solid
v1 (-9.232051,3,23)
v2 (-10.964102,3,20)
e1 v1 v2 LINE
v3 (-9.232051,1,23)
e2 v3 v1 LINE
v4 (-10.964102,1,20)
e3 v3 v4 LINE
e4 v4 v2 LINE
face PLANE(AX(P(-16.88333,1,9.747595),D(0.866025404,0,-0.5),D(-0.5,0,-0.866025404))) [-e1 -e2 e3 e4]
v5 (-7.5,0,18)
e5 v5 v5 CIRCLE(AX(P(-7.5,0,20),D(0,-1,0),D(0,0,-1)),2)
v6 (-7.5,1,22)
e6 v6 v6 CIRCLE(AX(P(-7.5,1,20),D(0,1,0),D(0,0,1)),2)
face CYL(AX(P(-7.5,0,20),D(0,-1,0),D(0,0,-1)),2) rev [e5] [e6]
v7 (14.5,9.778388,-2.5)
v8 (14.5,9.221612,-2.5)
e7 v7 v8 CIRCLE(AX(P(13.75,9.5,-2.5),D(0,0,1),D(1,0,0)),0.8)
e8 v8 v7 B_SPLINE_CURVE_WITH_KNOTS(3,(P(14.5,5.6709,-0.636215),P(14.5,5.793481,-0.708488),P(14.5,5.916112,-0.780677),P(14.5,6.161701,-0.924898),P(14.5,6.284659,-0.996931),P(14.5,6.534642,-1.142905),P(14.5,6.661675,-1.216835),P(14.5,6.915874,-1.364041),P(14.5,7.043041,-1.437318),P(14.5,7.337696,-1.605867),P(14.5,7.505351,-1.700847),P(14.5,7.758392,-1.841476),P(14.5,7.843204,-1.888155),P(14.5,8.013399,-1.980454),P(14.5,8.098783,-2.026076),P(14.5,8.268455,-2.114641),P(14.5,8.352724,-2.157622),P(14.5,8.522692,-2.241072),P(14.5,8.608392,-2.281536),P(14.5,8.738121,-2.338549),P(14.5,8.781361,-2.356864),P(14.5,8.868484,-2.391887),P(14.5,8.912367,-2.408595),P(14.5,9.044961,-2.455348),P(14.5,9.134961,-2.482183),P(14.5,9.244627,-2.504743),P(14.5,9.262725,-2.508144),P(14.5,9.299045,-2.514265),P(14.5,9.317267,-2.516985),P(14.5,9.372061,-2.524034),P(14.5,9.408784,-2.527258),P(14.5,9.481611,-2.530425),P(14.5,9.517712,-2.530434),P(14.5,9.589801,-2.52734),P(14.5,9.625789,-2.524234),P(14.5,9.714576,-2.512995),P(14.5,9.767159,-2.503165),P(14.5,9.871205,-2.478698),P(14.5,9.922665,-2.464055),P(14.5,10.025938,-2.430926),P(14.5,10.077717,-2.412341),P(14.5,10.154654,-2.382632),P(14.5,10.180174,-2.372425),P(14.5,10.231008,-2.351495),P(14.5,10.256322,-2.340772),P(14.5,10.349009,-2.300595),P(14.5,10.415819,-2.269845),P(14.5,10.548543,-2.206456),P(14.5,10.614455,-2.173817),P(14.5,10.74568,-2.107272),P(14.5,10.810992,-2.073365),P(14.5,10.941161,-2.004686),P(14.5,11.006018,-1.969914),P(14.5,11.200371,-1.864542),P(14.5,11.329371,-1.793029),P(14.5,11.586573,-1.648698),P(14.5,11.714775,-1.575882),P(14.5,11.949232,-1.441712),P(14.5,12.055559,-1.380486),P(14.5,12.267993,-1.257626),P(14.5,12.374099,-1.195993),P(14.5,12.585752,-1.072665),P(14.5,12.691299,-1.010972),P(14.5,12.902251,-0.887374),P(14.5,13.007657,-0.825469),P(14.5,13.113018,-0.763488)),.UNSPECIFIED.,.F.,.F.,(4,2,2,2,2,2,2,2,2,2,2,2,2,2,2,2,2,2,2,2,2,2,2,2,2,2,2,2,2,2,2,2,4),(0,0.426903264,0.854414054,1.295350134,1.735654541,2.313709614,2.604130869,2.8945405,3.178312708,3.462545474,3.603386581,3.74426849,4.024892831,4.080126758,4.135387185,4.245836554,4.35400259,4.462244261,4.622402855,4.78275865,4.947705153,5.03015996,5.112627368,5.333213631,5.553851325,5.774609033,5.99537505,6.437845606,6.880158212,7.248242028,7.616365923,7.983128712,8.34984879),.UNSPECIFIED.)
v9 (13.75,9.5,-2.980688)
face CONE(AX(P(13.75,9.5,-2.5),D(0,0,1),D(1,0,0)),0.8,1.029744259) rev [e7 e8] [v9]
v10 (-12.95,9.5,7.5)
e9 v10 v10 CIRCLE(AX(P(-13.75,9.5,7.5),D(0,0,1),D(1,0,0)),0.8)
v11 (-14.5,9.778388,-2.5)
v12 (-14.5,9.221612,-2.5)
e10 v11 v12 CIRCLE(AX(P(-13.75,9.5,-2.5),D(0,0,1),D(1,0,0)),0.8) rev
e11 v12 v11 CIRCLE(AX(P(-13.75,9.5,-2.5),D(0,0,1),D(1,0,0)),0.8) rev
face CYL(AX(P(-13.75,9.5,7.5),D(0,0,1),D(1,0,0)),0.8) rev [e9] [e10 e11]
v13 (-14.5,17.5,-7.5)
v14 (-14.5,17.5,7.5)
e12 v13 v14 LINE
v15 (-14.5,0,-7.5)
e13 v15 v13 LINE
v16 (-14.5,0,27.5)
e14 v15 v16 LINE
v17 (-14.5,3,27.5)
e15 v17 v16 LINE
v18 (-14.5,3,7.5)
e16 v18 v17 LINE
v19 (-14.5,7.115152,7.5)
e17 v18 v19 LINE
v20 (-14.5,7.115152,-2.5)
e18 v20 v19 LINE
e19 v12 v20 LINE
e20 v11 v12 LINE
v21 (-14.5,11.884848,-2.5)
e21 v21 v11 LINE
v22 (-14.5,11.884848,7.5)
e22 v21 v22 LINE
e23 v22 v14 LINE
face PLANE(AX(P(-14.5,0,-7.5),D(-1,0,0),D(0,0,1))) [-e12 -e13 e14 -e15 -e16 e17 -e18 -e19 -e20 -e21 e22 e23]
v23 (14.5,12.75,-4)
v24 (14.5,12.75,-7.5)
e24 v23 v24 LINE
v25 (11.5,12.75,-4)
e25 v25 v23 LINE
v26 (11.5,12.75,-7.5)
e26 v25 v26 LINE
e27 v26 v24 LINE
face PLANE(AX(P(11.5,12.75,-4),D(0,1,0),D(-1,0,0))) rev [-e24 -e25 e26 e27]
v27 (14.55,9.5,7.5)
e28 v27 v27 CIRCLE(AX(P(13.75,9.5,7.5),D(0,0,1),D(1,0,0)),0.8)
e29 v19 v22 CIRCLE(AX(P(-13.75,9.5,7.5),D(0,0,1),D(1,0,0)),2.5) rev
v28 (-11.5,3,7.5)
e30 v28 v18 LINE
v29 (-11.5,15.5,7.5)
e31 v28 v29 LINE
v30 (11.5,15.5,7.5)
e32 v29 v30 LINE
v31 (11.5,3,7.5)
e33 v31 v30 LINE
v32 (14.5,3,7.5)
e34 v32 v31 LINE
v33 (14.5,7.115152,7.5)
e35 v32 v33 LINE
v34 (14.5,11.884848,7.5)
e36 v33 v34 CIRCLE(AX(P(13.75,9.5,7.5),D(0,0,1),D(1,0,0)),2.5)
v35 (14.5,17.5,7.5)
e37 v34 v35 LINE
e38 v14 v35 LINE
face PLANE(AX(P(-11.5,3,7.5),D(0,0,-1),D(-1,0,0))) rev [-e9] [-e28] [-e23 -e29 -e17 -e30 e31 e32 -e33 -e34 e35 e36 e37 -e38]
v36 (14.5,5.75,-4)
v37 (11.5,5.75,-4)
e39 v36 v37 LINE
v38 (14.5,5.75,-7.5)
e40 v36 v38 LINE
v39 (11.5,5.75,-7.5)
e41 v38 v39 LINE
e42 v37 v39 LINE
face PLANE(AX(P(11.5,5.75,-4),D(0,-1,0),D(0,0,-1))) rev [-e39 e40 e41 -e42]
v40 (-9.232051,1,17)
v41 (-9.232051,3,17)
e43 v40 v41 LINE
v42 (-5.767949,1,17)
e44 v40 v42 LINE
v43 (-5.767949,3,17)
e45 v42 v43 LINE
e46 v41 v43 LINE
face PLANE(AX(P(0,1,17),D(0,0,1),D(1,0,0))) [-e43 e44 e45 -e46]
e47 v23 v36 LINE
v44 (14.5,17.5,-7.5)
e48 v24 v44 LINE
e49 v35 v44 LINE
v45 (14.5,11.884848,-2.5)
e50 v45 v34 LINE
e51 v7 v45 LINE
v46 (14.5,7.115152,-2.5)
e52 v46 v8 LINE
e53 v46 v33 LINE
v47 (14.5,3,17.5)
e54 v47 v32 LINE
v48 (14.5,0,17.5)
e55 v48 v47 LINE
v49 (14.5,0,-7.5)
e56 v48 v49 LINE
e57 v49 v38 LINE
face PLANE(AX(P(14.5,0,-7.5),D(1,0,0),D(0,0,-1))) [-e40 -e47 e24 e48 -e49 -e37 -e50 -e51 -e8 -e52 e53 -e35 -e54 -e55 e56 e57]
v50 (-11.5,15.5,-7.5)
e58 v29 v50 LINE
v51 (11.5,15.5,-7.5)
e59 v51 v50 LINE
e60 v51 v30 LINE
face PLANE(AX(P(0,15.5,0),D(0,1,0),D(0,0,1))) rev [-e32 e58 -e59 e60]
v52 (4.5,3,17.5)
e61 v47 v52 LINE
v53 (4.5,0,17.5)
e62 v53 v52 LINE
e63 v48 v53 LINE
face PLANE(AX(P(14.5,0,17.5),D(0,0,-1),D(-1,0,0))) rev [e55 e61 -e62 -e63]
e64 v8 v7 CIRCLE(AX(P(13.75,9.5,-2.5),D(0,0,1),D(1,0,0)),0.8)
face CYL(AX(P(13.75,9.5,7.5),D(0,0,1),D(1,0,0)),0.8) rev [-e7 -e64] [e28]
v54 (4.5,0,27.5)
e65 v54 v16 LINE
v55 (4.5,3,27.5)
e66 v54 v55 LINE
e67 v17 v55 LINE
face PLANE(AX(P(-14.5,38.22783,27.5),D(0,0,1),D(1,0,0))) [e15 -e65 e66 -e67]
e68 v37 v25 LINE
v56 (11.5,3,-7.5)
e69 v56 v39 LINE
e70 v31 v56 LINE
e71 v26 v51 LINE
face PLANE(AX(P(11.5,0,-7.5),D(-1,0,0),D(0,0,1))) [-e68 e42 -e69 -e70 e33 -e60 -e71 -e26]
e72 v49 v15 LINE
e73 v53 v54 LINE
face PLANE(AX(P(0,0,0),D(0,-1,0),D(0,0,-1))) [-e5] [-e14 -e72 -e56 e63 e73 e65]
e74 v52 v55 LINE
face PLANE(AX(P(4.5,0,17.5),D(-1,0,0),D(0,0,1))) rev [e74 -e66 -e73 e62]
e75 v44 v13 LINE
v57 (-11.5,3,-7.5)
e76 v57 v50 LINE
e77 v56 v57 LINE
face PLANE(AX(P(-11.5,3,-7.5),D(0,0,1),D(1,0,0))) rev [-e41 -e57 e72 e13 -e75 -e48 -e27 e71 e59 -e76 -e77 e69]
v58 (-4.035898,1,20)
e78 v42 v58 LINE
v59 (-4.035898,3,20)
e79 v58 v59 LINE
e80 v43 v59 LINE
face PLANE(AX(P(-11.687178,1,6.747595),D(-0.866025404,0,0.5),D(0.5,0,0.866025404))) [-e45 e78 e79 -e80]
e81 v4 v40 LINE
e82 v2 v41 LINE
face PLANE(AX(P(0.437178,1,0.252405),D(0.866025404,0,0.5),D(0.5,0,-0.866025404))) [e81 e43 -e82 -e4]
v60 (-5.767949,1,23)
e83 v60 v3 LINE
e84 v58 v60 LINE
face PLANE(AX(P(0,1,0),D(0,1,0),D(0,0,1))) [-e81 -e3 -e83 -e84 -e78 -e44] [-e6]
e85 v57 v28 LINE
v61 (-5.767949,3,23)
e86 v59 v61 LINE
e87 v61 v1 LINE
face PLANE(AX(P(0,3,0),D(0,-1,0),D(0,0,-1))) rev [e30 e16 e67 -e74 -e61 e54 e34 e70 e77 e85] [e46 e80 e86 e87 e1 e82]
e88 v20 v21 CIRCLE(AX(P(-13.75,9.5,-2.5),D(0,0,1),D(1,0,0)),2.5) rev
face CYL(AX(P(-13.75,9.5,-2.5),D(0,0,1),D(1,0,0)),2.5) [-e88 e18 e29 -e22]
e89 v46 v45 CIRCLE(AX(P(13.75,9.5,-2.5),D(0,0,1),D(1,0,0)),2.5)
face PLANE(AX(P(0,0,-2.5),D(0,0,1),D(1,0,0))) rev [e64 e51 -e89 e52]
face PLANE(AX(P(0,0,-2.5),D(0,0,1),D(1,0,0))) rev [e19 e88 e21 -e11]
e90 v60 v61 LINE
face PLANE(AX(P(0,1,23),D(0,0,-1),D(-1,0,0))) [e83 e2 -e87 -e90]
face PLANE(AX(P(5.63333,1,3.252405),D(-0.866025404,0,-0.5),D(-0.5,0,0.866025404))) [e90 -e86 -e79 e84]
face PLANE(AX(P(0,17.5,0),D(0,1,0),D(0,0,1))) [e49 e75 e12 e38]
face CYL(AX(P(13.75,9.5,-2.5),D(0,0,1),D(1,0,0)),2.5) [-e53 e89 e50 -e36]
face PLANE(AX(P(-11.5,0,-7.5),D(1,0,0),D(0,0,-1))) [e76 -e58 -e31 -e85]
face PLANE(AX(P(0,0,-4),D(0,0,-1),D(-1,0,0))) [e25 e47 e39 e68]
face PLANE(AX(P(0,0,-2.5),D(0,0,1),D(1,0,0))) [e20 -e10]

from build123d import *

# Parameters (mm, degrees)
SKETCH1_W                           = 23
SKETCH1_H                           = 15
BOSS_EXTRUDE1_DEPTH                 = 3
BOSS_EXTRUDE2_DEPTH                 = 12.5
BOSS_EXTRUDE2_DEPTH_BACK            = 3
SKETCH2_W                           = 3
SKETCH2_H                           = 15
BOSS_EXTRUDE3_DEPTH                 = 10
TAP_START                           = -2.5
TAP_DRILL_FOR_M2X0_4_TAP1_OUTLINE_R = 0.8
TAP_DRILL_FOR_M2X0_4_TAP1_DEPTH     = 10
SKETCH6_W                           = 29
SKETCH6_H                           = 20
BOSS_EXTRUDE4_DEPTH                 = 3
SKETCH7_W                           = 10
SKETCH7_H                           = 10
CUT_EXTRUDE1_DEPTH                  = 35.301056835
CUT_EXTRUDE2_DEPTH                  = 2
F_4_0_4_DIAMETER_HOLE1_D            = 4
F_4_0_4_DIAMETER_HOLE1_DEPTH        = 10
F_4_0_4_DIAMETER_HOLE1_TIP          = 1.201721238
SKETCH12_W                          = 29
SKETCH12_H                          = 15
BOSS_EXTRUDE5_DEPTH                 = 2
SKETCH13_W                          = 3
SKETCH13_H                          = 7
CUT_EXTRUDE4_DEPTH                  = 3.5


# Read off the part's stored shape, not the designer's step: Tap Drill for M2x0.4 Tap1
with BuildPart() as part:
    # Sketch1 → Boss-Extrude1 (new body)
    with BuildSketch(Plane(origin=(0, 0, 0), x_dir=(1, 0, 0), z_dir=(0, 1, 0))):
        Rectangle(SKETCH1_W, SKETCH1_H)
    extrude(amount=BOSS_EXTRUDE1_DEPTH)

    # Sketch2 → Boss-Extrude2 (add, two sides: drawn at the far end of the back side and taken through both)
    with BuildSketch(Plane(origin=(0, 3, 0), x_dir=(1, 0, 0), z_dir=(0, 1, 0)).offset(-BOSS_EXTRUDE2_DEPTH_BACK)):
        with Locations((13, 0)):
            Rectangle(SKETCH2_W, SKETCH2_H)
        with Locations((-13, 0)):
            Rectangle(SKETCH2_W, SKETCH2_H)
    extrude(amount=BOSS_EXTRUDE2_DEPTH + BOSS_EXTRUDE2_DEPTH_BACK)

    # Sketch3 → Boss-Extrude3 (add)
    with BuildSketch(Plane.XY.offset(7.5)):
        with BuildLine():
            ThreePointArc((16.25, 9.5), (15.765564437, 10.979019946), (14.5, 11.884848004))
            Line((14.5, 11.884848004), (14.5, 7.115151996))
            ThreePointArc((14.5, 7.115151996), (15.765564437, 8.020980054), (16.25, 9.5))
        make_face()
        with BuildLine():
            Line((-14.5, 7.115151996), (-14.5, 11.884848004))
            ThreePointArc((-14.5, 11.884848004), (-16.25, 9.5), (-14.5, 7.115151996))
        make_face()
    extrude(amount=-BOSS_EXTRUDE3_DEPTH)

    # Tap Drill for M2x0.4 Tap1 outline → Tap Drill for M2x0.4 Tap1 (cut)
    with BuildSketch(Plane.XY.offset(TAP_START)):
        with Locations((-13.75, 9.5)):
            Circle(TAP_DRILL_FOR_M2X0_4_TAP1_OUTLINE_R)
    extrude(amount=TAP_DRILL_FOR_M2X0_4_TAP1_DEPTH, mode=Mode.SUBTRACT)

    # Tap Drill for M2x0.4 Tap1 2 outline → Tap Drill for M2x0.4 Tap1 2 (revolve, cut)
    with BuildSketch(Plane(origin=(13.75, 9.5, 0), x_dir=(1, 0, 0), z_dir=(0, -1, 0))):
        Polygon((0, 7.5), (0, -2.980688495), (0.800001695, -2.499998981), (0.8, 7.5), align=None)
    revolve(axis=Axis((13.75, 9.5, 0), (0, 0, 1)), mode=Mode.SUBTRACT)

    # Sketch6 → Boss-Extrude4 (add)
    with BuildSketch(Plane.XZ):
        with Locations((0, 17.5)):
            Rectangle(SKETCH6_W, SKETCH6_H)
    extrude(amount=-BOSS_EXTRUDE4_DEPTH)

    # Sketch7 → Cut-Extrude1 (cut, through all)
    with BuildSketch(Plane(origin=(0, 3, 0), x_dir=(1, 0, 0), z_dir=(0, 1, 0))):
        with Locations((9.5, -22.5)):
            Rectangle(SKETCH7_W, SKETCH7_H)
    extrude(amount=-CUT_EXTRUDE1_DEPTH, mode=Mode.SUBTRACT)

    # Sketch8 → Cut-Extrude2 (cut)
    with BuildSketch(Plane.XZ.offset(-3)):
        Polygon((-5.767949192, 17), (-4.035898385, 20), (-5.767949192, 23), (-9.232050808, 23), (-10.964101615, 20), (-9.232050808, 17), align=None)
    extrude(amount=CUT_EXTRUDE2_DEPTH, mode=Mode.SUBTRACT)

    # Ø4.0 (4) Diameter Hole1
    with Locations(Plane(origin=(0, 0, 0), x_dir=(-1, 0, 0), z_dir=(0, -1, 0))):
        with Locations((7.5, -20)):
            Hole(F_4_0_4_DIAMETER_HOLE1_D / 2, depth=F_4_0_4_DIAMETER_HOLE1_DEPTH)
            with Locations((0, 0, -(F_4_0_4_DIAMETER_HOLE1_DEPTH + F_4_0_4_DIAMETER_HOLE1_TIP / 2))):  # 118° drill point
                Cone(0, F_4_0_4_DIAMETER_HOLE1_D / 2, F_4_0_4_DIAMETER_HOLE1_TIP, mode=Mode.SUBTRACT)

    # Sketch12 → Boss-Extrude5 (add)
    with BuildSketch(Plane(origin=(0, 15.5, 0), x_dir=(1, 0, 0), z_dir=(0, 1, 0))):
        Rectangle(SKETCH12_W, SKETCH12_H)
    extrude(amount=BOSS_EXTRUDE5_DEPTH)

    # Sketch13 → Cut-Extrude4 (cut)
    with BuildSketch(Plane(origin=(0, 0, -7.5), x_dir=(-1, 0, 0), z_dir=(0, 0, -1))):
        with Locations((-13, 9.25)):
            Rectangle(SKETCH13_W, SKETCH13_H)
    extrude(amount=-CUT_EXTRUDE4_DEPTH, mode=Mode.SUBTRACT)


solid = part.part
